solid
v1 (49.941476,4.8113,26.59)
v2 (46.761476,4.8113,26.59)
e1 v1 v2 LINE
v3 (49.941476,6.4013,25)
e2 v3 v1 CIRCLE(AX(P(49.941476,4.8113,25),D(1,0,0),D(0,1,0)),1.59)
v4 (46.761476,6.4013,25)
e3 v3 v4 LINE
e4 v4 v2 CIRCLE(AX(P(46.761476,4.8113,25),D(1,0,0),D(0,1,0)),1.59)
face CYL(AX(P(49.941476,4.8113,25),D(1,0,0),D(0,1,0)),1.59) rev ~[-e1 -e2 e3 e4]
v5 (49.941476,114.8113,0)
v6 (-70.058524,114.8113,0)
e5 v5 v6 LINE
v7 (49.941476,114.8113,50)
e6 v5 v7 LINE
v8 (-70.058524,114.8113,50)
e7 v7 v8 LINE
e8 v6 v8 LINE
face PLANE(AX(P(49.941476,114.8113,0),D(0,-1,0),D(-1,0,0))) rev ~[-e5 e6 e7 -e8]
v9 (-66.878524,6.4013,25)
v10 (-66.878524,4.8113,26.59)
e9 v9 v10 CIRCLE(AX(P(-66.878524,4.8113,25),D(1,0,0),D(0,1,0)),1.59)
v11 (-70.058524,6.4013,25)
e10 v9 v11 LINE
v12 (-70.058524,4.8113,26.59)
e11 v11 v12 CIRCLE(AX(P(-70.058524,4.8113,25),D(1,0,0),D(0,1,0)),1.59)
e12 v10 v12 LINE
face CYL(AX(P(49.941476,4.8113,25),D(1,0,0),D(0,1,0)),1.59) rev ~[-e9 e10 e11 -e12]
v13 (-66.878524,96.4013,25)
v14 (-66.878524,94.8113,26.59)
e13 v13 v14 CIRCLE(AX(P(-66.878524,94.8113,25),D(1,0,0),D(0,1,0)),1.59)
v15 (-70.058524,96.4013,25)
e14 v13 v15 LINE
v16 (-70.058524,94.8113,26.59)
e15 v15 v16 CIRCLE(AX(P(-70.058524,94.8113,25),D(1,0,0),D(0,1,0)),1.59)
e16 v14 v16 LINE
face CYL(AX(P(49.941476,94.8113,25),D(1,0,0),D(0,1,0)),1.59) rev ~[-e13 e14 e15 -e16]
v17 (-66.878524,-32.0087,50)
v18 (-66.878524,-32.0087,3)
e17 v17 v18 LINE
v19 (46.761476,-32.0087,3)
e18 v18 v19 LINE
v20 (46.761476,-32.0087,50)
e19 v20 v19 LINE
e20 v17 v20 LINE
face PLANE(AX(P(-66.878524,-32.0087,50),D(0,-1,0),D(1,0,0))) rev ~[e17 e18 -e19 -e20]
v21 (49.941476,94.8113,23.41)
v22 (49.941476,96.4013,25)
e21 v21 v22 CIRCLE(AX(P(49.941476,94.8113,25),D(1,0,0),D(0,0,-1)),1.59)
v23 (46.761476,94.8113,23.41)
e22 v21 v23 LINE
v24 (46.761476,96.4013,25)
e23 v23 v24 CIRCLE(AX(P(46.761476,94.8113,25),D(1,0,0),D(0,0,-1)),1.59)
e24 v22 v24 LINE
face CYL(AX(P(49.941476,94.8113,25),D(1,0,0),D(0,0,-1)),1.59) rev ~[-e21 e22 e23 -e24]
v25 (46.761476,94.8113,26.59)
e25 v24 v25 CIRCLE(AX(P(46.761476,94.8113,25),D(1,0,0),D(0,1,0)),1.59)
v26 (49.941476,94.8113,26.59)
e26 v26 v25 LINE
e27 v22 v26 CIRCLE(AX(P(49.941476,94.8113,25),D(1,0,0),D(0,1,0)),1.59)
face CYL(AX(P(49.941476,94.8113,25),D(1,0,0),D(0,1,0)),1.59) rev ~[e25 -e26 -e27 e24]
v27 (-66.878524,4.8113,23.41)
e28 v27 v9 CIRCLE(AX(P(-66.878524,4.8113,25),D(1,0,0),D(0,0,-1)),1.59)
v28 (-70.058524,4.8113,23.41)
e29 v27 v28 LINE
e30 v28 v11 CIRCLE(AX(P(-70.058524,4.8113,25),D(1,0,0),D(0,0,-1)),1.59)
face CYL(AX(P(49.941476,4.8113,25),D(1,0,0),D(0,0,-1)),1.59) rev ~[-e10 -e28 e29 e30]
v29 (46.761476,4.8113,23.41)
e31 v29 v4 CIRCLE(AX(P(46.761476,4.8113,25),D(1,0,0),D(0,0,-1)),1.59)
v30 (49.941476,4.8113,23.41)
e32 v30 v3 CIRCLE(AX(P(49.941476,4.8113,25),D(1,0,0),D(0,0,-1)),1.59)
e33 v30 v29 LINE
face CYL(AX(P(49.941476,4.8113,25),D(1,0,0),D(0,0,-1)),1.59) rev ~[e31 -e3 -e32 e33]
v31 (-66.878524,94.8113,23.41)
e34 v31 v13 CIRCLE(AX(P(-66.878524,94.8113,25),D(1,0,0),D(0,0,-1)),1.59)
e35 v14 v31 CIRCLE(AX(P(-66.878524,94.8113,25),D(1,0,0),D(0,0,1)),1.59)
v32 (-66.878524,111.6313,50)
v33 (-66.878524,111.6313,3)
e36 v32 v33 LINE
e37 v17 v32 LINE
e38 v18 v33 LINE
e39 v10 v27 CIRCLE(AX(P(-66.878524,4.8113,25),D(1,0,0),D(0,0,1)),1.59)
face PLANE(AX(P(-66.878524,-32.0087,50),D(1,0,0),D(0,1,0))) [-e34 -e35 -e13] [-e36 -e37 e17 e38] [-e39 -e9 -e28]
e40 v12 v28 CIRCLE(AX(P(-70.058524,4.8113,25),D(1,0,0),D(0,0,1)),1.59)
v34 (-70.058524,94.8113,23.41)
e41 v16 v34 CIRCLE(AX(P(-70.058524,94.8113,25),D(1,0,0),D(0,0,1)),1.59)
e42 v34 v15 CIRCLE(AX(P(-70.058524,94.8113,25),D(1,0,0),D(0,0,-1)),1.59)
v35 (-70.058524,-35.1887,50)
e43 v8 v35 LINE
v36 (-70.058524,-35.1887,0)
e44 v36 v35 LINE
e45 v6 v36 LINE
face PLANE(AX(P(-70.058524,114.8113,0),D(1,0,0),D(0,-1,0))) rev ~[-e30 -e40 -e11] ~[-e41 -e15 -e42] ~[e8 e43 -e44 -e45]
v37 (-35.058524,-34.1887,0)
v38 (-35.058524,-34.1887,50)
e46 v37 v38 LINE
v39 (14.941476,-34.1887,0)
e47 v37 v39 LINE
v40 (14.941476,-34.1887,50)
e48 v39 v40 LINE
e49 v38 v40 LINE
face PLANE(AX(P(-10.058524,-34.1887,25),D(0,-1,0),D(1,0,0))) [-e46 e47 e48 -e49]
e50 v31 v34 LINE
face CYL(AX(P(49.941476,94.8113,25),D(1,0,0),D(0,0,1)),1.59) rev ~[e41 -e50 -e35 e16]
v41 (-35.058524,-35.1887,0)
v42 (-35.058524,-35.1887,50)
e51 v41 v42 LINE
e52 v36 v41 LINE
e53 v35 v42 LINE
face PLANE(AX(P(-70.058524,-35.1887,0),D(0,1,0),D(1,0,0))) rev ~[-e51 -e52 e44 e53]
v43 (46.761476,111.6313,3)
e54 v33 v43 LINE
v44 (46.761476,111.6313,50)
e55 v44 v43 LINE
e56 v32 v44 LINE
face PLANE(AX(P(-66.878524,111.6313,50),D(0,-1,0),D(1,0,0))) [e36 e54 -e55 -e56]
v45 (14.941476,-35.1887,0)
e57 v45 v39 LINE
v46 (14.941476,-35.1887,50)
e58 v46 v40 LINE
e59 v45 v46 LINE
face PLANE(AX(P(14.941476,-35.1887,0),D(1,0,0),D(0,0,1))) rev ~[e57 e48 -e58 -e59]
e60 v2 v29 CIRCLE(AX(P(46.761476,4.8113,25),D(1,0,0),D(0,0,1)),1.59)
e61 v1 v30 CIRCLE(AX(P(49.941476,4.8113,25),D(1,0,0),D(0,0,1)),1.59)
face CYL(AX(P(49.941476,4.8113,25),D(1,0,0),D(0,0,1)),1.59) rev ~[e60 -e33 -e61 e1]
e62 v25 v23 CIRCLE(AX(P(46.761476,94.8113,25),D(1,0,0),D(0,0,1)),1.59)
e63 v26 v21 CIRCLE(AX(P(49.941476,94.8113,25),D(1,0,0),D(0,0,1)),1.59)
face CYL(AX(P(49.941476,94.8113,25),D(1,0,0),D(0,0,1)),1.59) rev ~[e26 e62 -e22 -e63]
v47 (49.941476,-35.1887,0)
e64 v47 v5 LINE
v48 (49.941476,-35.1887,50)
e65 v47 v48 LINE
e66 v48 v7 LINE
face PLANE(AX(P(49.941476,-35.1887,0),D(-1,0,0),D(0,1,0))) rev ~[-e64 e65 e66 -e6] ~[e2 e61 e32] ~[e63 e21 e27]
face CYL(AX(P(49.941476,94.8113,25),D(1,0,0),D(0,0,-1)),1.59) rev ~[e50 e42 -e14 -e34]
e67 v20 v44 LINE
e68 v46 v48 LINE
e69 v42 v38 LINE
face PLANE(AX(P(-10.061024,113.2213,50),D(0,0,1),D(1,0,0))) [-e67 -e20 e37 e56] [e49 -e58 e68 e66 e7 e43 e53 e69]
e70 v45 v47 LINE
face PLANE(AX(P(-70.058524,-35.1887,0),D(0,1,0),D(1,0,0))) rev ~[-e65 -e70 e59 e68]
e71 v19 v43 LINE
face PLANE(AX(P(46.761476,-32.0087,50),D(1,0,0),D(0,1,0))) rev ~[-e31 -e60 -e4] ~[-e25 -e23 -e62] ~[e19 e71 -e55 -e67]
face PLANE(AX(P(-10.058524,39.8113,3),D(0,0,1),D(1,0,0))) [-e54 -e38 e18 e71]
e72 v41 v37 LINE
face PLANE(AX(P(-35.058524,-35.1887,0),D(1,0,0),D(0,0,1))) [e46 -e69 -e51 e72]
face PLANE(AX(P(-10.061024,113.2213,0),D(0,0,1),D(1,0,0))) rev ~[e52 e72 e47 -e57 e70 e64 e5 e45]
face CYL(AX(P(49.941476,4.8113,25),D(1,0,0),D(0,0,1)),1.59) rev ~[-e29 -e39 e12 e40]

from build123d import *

# Parameters (mm, degrees)
F0_W     = 113.645
F0_H     = 3.18
F0_W_2   = 3.175
F0_H_2   = 143.64
F0_W_3   = 3.18
F1_DEPTH = 50
F2_W     = 113.64
F2_H     = 143.64
F3_DEPTH = 47
F5_DEPTH = 120.001
F6_W     = 50
F6_H     = 50
F7_DEPTH = 1


with BuildPart() as f1:
    # F0 (on Top) → F1 (new body)
    with BuildSketch(Plane.XY):
        with Locations((-10.0610243238, 113.2212999272)):
            Rectangle(F0_W, F0_H)
        with Locations((-68.4710243238, 113.2212999272)):
            Rectangle(F0_W_2, F0_H)
        with Locations((-68.4710243238, 39.8112999272)):
            Rectangle(F0_W_2, F0_H_2)
        with Locations((-10.0610243238, -33.5987000728)):
            Rectangle(F0_W, F0_H)
        with Locations((48.3514756762, 39.8112999272)):
            Rectangle(F0_W_3, F0_H_2)
        with Locations((48.3514756762, -33.5987000728)):
            Rectangle(F0_W_3, F0_H)
        with Locations((48.3514756762, 113.2212999272)):
            Rectangle(F0_W_3, F0_H)
        with Locations((-68.4710243238, -33.5987000728)):
            Rectangle(F0_W_2, F0_H)
        with Locations((-10.0610243238, 39.8112999272)):
            Rectangle(F0_W, F0_H_2)
    extrude(amount=F1_DEPTH)

    # F2 (on face) → F3 (cut)
    with BuildSketch(Plane.XY.offset(50)):
        with Locations((-10.0585243238, 39.8112999272)):
            Rectangle(F2_W, F2_H)
    extrude(amount=-F3_DEPTH, mode=Mode.SUBTRACT)

    # F4 (on face) → F5 (cut, through all)
    with BuildSketch(Plane.YZ.offset(49.9414756762)):
        with BuildLine():
            ThreePointArc((6.4012999272, 25), (5.9355997093, 26.1242997821), (4.8112999272, 26.59))
            Line((4.8112999272, 26.59), (4.8112999272, 23.41))
            ThreePointArc((4.8112999272, 23.41), (5.9355997093, 23.8757002179), (6.4012999272, 25))
        make_face()
        with BuildLine():
            Line((4.8112999272, 23.41), (4.8112999272, 26.59))
            ThreePointArc((4.8112999272, 26.59), (3.2212999272, 25), (4.8112999272, 23.41))
        make_face()
        with BuildLine():
            ThreePointArc((96.4012999272, 25), (95.9355997093, 26.1242997821), (94.8112999272, 26.59))
            Line((94.8112999272, 26.59), (94.8112999272, 23.41))
            ThreePointArc((94.8112999272, 23.41), (95.9355997093, 23.8757002179), (96.4012999272, 25))
        make_face()
        with BuildLine():
            Line((94.8112999272, 23.41), (94.8112999272, 26.59))
            ThreePointArc((94.8112999272, 26.59), (93.2212999272, 25), (94.8112999272, 23.41))
        make_face()
    extrude(amount=-F5_DEPTH, mode=Mode.SUBTRACT)

    # F6 (on face) → F7 (cut)
    with BuildSketch(Plane.XZ.offset(35.1887000728)):
        with Locations((-10.0585243238, 25)):
            Rectangle(F6_W, F6_H)
    extrude(amount=-F7_DEPTH, mode=Mode.SUBTRACT)


solid = f1.part
